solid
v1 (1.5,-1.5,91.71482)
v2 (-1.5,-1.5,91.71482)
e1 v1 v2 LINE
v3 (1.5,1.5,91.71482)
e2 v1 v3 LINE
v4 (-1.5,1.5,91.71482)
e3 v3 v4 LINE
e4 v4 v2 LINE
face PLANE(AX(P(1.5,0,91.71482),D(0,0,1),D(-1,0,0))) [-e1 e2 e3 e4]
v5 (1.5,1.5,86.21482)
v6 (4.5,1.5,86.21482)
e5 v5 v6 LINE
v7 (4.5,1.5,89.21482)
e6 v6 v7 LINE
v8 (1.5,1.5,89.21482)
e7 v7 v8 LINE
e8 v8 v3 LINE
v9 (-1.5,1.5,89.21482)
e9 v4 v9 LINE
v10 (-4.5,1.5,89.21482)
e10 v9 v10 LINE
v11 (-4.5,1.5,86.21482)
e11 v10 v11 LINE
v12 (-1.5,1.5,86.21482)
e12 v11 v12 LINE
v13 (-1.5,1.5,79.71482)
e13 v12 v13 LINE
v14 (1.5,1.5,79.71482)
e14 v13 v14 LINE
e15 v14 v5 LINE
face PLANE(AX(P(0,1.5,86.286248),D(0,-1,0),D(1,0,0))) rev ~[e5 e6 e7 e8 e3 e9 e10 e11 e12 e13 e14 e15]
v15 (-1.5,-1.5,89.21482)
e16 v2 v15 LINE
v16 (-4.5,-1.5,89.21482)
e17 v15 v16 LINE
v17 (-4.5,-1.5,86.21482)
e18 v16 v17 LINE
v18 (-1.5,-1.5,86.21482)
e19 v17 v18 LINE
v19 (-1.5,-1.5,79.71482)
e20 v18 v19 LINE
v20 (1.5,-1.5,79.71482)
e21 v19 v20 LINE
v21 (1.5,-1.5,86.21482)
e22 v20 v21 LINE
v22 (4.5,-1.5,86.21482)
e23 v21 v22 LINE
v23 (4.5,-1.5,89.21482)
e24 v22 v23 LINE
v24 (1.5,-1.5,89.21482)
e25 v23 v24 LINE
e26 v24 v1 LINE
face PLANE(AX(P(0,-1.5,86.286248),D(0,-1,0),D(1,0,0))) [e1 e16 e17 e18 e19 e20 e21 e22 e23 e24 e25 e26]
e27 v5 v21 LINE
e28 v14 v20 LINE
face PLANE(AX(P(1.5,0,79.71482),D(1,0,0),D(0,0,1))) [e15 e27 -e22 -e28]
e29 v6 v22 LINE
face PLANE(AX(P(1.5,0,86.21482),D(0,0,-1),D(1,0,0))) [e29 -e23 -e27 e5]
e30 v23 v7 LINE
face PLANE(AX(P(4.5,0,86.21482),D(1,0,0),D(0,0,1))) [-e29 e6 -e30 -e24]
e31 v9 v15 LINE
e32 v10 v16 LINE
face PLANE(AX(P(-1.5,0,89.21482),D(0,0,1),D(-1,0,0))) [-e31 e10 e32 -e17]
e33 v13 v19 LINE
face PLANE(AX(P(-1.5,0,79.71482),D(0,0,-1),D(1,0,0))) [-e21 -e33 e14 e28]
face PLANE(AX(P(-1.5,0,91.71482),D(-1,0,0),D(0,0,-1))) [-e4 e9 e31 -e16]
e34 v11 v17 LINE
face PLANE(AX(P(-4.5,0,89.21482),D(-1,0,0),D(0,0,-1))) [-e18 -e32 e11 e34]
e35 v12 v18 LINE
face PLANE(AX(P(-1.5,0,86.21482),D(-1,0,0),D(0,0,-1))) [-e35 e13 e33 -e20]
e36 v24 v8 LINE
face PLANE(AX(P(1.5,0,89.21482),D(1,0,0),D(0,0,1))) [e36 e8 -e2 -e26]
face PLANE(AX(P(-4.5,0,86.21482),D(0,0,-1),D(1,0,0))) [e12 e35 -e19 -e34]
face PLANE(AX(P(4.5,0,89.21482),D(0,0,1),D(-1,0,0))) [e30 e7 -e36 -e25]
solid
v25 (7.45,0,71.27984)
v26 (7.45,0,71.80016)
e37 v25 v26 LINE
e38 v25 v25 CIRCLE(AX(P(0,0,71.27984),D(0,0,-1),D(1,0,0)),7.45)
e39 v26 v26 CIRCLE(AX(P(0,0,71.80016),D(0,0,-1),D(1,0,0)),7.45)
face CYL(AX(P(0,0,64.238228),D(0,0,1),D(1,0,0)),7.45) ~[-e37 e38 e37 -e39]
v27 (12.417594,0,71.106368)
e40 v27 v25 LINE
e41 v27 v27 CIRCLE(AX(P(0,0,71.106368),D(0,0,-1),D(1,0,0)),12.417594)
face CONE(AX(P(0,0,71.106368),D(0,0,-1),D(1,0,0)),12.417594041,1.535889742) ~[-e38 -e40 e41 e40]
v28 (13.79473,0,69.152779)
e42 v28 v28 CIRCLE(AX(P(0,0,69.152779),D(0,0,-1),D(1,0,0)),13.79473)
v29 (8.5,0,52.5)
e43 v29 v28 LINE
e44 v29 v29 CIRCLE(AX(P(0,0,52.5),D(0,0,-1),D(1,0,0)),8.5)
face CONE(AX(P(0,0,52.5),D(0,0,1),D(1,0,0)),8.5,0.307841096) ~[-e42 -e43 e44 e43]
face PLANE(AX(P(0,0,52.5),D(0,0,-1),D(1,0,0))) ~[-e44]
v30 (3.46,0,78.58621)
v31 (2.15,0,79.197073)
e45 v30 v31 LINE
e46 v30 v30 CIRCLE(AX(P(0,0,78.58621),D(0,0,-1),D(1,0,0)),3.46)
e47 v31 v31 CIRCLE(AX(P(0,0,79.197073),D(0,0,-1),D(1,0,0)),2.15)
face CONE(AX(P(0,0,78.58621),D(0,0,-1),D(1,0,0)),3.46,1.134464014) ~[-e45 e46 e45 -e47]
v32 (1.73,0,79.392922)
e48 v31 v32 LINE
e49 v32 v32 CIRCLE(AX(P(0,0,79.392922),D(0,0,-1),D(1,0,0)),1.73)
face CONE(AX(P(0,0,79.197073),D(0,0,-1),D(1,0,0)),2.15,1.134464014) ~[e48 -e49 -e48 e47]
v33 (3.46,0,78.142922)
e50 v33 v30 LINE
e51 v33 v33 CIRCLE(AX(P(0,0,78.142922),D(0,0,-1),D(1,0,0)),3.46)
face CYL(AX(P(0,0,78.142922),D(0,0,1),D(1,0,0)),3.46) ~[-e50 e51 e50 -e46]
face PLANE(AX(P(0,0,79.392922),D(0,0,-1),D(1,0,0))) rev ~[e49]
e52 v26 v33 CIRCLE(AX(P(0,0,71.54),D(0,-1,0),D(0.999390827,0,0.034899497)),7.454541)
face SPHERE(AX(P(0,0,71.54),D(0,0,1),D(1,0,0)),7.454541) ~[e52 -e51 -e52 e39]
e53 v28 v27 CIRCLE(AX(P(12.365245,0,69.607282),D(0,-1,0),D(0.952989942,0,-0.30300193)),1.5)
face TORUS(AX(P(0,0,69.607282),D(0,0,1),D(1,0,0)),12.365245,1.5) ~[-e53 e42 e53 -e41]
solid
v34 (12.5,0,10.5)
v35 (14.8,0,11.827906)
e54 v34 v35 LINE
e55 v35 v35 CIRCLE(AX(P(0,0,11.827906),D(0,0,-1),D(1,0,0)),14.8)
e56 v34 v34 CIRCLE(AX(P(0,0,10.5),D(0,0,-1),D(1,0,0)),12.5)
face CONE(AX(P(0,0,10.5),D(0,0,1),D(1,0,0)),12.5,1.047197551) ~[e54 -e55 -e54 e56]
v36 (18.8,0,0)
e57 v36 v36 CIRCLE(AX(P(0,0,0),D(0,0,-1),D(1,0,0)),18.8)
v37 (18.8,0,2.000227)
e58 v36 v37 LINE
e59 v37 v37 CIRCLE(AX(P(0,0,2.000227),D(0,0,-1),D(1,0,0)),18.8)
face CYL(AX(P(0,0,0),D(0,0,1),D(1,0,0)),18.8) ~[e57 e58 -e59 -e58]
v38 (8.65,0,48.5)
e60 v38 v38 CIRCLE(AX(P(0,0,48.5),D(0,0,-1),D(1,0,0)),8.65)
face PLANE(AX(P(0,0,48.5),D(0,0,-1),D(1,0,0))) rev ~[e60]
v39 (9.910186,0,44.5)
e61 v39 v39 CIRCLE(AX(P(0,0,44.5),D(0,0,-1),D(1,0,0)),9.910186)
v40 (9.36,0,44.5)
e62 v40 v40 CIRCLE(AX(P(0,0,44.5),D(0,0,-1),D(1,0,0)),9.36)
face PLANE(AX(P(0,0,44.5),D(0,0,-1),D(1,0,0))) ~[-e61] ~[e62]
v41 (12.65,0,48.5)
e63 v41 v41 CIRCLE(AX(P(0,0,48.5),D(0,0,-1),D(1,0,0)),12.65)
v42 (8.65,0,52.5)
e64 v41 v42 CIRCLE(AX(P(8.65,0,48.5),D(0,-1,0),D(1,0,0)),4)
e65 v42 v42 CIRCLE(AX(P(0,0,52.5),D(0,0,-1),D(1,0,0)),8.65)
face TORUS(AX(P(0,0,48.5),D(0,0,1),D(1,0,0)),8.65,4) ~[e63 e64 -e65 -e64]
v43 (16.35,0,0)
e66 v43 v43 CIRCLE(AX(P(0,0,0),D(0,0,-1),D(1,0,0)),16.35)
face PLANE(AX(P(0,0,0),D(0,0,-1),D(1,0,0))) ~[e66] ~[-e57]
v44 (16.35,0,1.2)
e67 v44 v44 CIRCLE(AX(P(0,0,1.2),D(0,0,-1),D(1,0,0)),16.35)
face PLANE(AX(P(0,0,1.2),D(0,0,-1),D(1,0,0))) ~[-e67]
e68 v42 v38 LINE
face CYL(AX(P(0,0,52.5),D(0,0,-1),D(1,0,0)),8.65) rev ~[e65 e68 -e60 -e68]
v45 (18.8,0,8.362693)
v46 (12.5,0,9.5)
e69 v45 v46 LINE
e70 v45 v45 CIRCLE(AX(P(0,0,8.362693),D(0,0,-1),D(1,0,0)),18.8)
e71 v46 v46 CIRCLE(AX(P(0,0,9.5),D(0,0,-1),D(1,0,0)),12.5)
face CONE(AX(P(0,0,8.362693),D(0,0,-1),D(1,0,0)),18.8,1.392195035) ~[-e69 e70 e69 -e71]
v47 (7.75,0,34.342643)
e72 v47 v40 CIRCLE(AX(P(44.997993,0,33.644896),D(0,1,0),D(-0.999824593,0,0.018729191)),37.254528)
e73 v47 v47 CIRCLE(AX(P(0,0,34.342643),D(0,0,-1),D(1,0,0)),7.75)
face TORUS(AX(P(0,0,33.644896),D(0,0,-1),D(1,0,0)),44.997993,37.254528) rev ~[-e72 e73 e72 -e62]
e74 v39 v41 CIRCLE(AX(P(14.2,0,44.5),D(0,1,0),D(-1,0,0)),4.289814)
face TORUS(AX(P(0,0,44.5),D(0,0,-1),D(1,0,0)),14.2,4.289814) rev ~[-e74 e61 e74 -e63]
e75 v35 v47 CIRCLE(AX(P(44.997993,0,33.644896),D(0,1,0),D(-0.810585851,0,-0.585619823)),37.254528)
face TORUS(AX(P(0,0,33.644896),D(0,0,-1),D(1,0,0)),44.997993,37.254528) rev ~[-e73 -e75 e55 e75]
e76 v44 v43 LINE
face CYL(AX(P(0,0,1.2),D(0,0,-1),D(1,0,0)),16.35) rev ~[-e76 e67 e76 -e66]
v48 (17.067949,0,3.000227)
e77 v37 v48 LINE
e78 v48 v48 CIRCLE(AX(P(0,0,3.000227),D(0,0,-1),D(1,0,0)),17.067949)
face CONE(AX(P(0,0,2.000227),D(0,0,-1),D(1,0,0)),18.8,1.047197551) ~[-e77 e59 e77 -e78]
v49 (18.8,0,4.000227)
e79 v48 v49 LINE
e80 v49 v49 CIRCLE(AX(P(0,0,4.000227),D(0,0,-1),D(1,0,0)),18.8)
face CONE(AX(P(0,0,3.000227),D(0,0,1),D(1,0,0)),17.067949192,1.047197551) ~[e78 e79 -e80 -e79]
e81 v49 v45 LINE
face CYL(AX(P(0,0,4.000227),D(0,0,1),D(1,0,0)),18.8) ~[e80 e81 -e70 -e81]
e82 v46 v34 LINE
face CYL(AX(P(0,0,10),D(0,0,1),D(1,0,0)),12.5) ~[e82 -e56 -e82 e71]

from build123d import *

# Parameters (mm, degrees)
F0_W     = 12.5
F0_H     = 1
F3_DEPTH = 1.5


# Not quite as in the source:
# - a feature names something its author has since deleted; it is built from what else it names


with BuildPart() as f1:
    # F0 (on Front) → F1 (revolve)
    with BuildSketch(Plane.XZ):
        Polygon((18.8, 0), (18.8, 2.0002274268), (17.0679491924, 3.0002274268), (18.8, 4.0002274268), (18.8, 8.3626933041), (12.5, 9.5), (0, 9.5), (0, 1.2), (16.35, 1.2), (16.35, 0), align=None)
        with Locations((6.25, 10)):
            Rectangle(F0_W, F0_H)
        with BuildLine():
            Line((0, 34.3426428735), (7.75, 34.3426428735))
            ThreePointArc((7.75, 34.3426428735), (8.2028205644, 39.4771439193), (9.36, 44.5))
            Line((9.36, 44.5), (0, 44.5))
            Line((0, 44.5), (0, 34.3426428735))
        make_face()
        with BuildLine():
            Line((0, 44.5), (9.36, 44.5))
            Line((9.36, 44.5), (9.9101864842, 44.5))
            ThreePointArc((9.9101864842, 44.5), (10.6608114666, 46.9241791446), (12.65, 48.5))
            Line((12.65, 48.5), (8.65, 48.5))
            Line((8.65, 48.5), (0, 48.5))
            Line((0, 48.5), (0, 44.5))
        make_face()
        with BuildLine():
            Line((8.65, 48.5), (12.65, 48.5))
            ThreePointArc((12.65, 48.5), (11.4784271247, 51.3284271247), (8.65, 52.5))
            Line((8.65, 52.5), (8.65, 48.5))
        make_face()
        with BuildLine():
            Line((0, 10.5), (12.5, 10.5))
            Line((12.5, 10.5), (14.8, 11.8279056191))
            ThreePointArc((14.8, 11.8279056191), (9.4456568695, 22.5124552556), (7.75, 34.3426428735))
            Line((7.75, 34.3426428735), (0, 34.3426428735))
            Line((0, 34.3426428735), (0, 10.5))
        make_face()
    revolve(axis=Axis((0, 0, 39.4972705525), (0, 0, -1)))


with BuildPart() as f1b:
    # F0 (on Front) → F1, piece 2 (revolve)
    with BuildSketch(Plane.XZ):
        with BuildLine():
            Line((0, 64.2382279038), (0, 52.5))
            Line((0, 52.5), (8.5, 52.5))
            Line((8.5, 52.5), (13.7947297094, 69.1527789248))
            ThreePointArc((13.7947297094, 69.1527789248), (13.5912487708, 70.4715238313), (12.417594041, 71.1063680609))
            Line((12.417594041, 71.1063680609), (7.45, 71.2798402673))
            Line((7.45, 71.2798402673), (7.45, 64.2382279038))
            Line((7.45, 64.2382279038), (0, 64.2382279038))
        make_face()
        with BuildLine():
            Line((0, 78.1429223141), (0, 64.2382279038))
            Line((0, 64.2382279038), (7.45, 64.2382279038))
            Line((7.45, 64.2382279038), (7.45, 71.2798402673))
            Line((7.45, 71.2798402673), (7.45, 71.8001597327))
            ThreePointArc((7.45, 71.8001597327), (6.3098878192, 75.5093196892), (3.46, 78.1429223141))
            Line((3.46, 78.1429223141), (2.15, 78.1429223141))
            Line((2.15, 78.1429223141), (0, 78.1429223141))
        make_face()
        Polygon((0, 78.994541105), (0, 78.1429223141), (2.15, 78.1429223141), (2.15, 79.1970730977), (1.73, 79.3929223141), (0, 79.3929223141), align=None)
        Polygon((2.15, 79.1970730977), (2.15, 78.1429223141), (3.46, 78.1429223141), (3.46, 78.5862100655), align=None)
    revolve(axis=Axis((0, 0, 39.4972705525), (0, 0, -1)))


with BuildPart() as f3:
    # F2 (on Front) → F3 (new body, symmetric)
    with BuildSketch(Plane.XZ):
        Polygon((1.5, 91.7148197889), (0, 91.7148197889), (-1.5, 91.7148197889), (-1.5, 89.2148197889), (-4.5, 89.2148197889), (-4.5, 86.2148197889), (-1.5, 86.2148197889), (-1.5, 79.7148197889), (0, 79.7148197889), (1.5, 79.7148197889), (1.5, 86.2148197889), (4.5, 86.2148197889), (4.5, 89.2148197889), (1.5, 89.2148197889), align=None)
    extrude(amount=F3_DEPTH, both=True)


solid = Compound([f1.part, f1b.part, f3.part])
